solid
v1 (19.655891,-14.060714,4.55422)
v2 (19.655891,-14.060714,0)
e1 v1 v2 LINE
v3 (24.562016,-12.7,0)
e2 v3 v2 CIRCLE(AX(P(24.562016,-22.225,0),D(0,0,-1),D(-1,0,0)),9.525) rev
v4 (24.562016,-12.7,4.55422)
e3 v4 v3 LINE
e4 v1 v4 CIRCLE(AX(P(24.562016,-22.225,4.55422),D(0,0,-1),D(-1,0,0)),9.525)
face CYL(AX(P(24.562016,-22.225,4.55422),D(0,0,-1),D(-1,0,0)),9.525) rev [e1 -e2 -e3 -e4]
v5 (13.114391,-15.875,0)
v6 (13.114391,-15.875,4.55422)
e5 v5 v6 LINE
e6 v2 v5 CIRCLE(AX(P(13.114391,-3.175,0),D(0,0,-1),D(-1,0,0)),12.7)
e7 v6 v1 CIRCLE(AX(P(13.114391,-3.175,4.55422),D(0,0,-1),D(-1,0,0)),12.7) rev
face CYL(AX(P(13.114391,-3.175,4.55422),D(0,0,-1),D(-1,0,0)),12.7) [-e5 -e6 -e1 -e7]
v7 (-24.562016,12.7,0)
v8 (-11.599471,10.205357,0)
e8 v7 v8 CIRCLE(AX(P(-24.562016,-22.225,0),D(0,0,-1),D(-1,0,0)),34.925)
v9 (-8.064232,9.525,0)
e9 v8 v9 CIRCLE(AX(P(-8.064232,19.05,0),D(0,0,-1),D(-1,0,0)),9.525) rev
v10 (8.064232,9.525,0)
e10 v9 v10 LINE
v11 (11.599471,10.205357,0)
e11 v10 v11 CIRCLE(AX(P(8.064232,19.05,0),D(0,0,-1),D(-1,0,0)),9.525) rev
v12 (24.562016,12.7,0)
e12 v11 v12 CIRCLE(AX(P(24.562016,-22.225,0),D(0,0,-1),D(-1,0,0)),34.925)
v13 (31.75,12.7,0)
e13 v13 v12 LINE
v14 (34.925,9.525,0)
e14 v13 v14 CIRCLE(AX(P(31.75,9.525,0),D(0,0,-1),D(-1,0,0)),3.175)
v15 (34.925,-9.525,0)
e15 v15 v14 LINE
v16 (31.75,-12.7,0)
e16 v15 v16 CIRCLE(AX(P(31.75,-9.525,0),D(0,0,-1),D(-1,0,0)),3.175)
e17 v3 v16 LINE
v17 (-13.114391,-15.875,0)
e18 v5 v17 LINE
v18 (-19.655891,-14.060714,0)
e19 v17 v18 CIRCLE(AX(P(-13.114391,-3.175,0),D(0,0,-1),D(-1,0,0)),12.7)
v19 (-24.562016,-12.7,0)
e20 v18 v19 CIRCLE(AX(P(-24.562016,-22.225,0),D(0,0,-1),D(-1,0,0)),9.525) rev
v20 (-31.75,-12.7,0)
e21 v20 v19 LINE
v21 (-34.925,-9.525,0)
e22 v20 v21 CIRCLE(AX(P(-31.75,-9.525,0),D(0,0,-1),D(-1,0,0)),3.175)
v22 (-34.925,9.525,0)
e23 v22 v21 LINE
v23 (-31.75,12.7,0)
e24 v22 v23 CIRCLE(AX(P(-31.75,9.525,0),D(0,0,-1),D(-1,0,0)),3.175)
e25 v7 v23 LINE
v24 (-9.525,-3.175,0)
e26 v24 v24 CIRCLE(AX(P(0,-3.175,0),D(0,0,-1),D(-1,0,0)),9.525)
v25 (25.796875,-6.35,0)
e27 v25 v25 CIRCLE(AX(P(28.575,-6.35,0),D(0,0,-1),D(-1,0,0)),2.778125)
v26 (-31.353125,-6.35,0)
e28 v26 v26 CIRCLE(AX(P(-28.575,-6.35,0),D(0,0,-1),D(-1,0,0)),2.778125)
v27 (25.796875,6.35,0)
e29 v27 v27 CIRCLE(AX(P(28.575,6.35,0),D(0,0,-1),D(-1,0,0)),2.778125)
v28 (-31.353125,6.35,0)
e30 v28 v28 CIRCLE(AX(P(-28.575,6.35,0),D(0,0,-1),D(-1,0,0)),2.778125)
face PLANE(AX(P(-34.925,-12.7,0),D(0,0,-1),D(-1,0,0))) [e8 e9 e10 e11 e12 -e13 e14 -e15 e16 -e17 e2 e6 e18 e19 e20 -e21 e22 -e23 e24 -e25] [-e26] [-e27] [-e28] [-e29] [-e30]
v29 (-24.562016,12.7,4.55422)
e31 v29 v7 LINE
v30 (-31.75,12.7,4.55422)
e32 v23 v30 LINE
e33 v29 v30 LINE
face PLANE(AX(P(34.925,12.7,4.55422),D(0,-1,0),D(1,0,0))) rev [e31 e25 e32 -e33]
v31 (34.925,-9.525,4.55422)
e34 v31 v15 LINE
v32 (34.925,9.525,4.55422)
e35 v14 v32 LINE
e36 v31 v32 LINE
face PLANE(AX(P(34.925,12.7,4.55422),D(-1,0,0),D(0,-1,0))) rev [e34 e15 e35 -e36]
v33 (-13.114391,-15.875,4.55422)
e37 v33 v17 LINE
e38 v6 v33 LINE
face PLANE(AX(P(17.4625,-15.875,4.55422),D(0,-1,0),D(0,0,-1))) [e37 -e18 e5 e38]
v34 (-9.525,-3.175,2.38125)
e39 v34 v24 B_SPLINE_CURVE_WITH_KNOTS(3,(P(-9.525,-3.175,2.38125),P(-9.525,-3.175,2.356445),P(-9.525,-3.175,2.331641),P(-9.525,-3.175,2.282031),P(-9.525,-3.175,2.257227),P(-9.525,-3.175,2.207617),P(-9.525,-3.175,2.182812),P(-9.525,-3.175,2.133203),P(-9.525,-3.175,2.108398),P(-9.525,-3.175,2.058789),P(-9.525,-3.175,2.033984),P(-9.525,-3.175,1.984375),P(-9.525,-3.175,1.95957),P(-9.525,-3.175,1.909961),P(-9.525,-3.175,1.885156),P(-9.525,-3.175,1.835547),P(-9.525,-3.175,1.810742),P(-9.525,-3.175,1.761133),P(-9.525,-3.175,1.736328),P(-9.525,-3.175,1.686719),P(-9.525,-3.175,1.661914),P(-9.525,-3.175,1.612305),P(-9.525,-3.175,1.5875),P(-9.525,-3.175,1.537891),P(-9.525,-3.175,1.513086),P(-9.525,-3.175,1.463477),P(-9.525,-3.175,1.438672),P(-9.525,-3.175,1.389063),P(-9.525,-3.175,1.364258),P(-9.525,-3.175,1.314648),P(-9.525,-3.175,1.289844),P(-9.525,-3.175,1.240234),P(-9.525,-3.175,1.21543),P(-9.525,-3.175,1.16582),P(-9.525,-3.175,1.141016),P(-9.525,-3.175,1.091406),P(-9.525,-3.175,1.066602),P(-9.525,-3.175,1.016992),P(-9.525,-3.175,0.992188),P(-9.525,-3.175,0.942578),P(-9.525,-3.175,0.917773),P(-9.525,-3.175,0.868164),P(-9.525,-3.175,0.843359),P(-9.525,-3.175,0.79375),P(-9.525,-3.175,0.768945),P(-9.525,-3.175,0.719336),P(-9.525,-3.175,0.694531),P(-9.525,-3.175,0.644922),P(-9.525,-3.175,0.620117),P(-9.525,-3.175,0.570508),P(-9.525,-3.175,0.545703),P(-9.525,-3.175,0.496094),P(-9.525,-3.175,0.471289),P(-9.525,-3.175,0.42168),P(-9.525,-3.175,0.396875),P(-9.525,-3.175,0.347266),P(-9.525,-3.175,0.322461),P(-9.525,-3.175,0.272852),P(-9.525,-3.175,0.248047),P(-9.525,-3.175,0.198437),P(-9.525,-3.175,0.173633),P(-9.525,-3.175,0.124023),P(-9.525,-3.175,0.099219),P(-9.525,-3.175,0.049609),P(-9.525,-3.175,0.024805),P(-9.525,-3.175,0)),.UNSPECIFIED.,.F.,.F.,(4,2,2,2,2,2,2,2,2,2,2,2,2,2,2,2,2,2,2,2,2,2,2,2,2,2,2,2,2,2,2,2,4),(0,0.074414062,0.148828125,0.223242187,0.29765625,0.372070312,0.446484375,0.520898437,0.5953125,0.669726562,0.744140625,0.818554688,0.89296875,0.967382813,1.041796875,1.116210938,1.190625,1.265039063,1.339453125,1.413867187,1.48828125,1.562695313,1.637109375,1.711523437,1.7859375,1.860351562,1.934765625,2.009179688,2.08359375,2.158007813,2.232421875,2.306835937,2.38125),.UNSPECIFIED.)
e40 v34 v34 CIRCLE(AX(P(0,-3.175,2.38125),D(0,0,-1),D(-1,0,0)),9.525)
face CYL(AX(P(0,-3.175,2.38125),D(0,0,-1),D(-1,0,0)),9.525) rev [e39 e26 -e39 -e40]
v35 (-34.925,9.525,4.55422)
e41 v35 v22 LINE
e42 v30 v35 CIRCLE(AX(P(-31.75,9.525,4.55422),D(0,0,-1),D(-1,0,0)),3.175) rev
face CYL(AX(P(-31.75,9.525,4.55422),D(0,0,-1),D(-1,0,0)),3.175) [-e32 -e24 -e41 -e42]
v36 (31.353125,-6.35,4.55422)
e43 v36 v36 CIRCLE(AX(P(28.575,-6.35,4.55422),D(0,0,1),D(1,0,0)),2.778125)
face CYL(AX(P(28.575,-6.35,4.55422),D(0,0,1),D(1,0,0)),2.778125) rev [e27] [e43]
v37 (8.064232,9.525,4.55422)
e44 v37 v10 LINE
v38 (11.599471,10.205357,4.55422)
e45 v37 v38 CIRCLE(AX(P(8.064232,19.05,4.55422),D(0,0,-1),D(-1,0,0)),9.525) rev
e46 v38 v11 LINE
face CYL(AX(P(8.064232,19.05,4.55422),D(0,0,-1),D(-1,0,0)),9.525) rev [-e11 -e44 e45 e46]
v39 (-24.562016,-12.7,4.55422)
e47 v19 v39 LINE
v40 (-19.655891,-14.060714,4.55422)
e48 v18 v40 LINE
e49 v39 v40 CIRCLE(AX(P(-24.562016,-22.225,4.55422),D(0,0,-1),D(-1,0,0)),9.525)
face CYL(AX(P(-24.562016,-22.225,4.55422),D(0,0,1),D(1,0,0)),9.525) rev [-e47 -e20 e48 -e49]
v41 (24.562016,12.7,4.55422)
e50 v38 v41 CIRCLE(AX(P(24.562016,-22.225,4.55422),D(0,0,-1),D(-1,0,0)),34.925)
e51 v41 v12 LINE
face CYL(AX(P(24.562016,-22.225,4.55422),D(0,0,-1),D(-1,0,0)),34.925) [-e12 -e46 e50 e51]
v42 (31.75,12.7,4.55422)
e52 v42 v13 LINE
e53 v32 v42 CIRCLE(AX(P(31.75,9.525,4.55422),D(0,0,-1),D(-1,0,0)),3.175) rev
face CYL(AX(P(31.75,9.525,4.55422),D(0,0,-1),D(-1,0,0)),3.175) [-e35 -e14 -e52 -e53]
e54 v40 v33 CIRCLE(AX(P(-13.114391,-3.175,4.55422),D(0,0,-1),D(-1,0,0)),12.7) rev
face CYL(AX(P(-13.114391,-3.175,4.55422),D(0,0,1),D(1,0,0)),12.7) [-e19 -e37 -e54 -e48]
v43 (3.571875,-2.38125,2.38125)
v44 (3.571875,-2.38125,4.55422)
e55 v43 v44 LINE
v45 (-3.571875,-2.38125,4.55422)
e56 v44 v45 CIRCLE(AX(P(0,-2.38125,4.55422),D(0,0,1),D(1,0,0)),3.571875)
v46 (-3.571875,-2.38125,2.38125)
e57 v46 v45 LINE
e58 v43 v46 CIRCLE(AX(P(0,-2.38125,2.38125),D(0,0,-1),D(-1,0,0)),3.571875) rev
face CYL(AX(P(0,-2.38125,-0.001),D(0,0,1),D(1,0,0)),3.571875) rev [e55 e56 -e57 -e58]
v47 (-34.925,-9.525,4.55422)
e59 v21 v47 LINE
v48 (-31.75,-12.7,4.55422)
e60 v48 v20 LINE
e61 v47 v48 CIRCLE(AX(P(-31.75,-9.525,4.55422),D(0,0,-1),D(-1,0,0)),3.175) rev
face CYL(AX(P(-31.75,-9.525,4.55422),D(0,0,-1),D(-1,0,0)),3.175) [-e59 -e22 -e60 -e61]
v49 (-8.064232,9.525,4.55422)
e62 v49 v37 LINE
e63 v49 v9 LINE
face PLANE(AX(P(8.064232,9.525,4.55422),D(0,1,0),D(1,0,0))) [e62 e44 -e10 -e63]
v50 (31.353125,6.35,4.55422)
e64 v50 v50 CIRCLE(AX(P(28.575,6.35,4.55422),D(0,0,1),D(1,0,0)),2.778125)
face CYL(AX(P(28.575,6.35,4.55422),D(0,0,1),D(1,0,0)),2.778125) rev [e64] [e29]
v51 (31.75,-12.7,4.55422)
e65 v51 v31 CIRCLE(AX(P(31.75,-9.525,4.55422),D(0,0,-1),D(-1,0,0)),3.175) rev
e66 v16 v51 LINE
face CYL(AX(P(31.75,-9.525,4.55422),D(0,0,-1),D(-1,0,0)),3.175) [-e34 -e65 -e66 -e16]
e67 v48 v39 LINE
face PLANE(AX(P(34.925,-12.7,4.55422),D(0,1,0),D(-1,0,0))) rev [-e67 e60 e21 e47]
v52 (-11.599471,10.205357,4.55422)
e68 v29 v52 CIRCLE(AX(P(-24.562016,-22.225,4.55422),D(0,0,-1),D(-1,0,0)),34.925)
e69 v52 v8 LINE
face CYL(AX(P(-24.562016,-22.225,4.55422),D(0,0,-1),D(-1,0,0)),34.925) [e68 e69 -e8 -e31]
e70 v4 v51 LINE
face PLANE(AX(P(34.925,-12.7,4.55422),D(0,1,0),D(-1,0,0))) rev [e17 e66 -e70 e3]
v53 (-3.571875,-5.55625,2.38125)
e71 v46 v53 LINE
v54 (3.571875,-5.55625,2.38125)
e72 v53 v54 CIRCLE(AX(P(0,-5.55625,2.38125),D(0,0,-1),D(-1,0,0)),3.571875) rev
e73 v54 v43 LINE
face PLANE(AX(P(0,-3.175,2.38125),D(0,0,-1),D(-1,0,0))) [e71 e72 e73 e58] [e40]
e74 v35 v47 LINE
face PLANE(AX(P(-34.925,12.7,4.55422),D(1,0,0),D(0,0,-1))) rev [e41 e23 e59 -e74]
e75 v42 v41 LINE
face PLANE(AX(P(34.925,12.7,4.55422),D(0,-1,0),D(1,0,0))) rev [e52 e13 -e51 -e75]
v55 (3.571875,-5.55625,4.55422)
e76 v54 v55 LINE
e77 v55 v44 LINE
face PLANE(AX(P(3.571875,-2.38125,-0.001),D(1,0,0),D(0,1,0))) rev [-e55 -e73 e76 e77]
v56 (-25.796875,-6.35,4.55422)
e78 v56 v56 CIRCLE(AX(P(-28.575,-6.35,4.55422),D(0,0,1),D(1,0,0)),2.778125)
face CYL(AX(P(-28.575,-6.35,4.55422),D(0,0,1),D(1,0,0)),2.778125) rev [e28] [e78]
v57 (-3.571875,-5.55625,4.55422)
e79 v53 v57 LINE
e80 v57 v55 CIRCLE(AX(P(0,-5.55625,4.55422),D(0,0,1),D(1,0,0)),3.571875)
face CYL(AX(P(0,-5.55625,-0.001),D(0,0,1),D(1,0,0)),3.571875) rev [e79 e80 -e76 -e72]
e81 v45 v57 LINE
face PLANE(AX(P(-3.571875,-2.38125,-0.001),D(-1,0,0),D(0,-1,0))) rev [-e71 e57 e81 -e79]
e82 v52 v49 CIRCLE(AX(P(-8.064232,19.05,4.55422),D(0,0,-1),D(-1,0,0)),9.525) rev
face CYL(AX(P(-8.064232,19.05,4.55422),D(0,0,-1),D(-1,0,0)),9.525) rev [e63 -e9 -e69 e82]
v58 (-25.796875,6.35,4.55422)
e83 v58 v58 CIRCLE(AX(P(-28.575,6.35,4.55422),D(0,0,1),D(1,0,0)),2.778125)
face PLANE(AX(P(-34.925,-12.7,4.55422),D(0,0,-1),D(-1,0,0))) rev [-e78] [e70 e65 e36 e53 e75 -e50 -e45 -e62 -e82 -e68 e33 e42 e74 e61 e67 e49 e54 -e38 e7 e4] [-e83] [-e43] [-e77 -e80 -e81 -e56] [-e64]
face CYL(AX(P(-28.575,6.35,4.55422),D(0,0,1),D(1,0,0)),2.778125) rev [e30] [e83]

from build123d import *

# Parameters (mm, degrees)
SKETCH1_W                       = 69.85
SKETCH1_H                       = 25.4
BASE_FLANGE1_DEPTH              = 4.55422
F_7_32_0_21875_DIAMETER_HOLE1_D = 5.55625
BREAK_CORNER1_DEPTH             = 4.55422
SKETCH4_W                       = 34.925
SKETCH4_H                       = 3.175
TAB1_DEPTH                      = 4.55422
FILLET1_R                       = 9.525
CUT_EXTRUDE1_REACH              = 40.633
SKETCH7_R                       = 9.525
CUT_EXTRUDE3_DEPTH              = 2.38125
F_9_32_0_28125_DIAMETER_HOLE1_D = 7.14375
FILLET3_R                       = 12.7
CUT_EXTRUDE4_START              = -2.17297
CUT_EXTRUDE4_DEPTH              = 2.17297


# Read off the part's stored shape, not the designer's step: Break-Corner1
# Sheet-metal steps are written as plain solids
with BuildPart() as part:
    # Sketch1 → Base-Flange1 (new body)
    with BuildSketch(Plane.XY):
        Rectangle(SKETCH1_W, SKETCH1_H)
    extrude(amount=BASE_FLANGE1_DEPTH)

    # 7/32 (0.21875) Diameter Hole1 (through all)
    with Locations(Plane.XY.offset(4.55422)):
        with Locations((-28.575, 6.35), (-28.575, -6.35), (28.575, 6.35), (28.575, -6.35)):
            Hole(F_7_32_0_21875_DIAMETER_HOLE1_D / 2)

    # Break-Corner1 outline → Break-Corner1 (cut)
    with BuildSketch(Plane.XY):
        with BuildLine():
            Line((34.925, -12.7), (34.925, -9.525))
            ThreePointArc((34.925, -9.525), (33.99506403, -11.77006403), (31.75, -12.7))
            Line((31.75, -12.7), (34.925, -12.7))
        make_face()
        with BuildLine():
            ThreePointArc((31.75, 12.7), (33.99506403, 11.77006403), (34.925, 9.525))
            Line((34.925, 9.525), (34.925, 12.7))
            Line((34.925, 12.7), (31.75, 12.7))
        make_face()
        with BuildLine():
            Line((-34.925, -12.7), (-31.75, -12.7))
            ThreePointArc((-31.75, -12.7), (-33.99506403, -11.77006403), (-34.925, -9.525))
            Line((-34.925, -9.525), (-34.925, -12.7))
        make_face()
        with BuildLine():
            ThreePointArc((-34.925, 9.525), (-33.99506403, 11.77006403), (-31.75, 12.7))
            Line((-31.75, 12.7), (-34.925, 12.7))
            Line((-34.925, 12.7), (-34.925, 9.525))
        make_face()
    extrude(amount=BREAK_CORNER1_DEPTH, mode=Mode.SUBTRACT)

    # Sketch4 → Tab1 (add)
    with BuildSketch(Plane(origin=(0, 0, 0), x_dir=(-1, 0, 0), z_dir=(0, 0, -1))):
        with Locations((0, -14.2875)):
            Rectangle(SKETCH4_W, SKETCH4_H)
    extrude(amount=-TAB1_DEPTH)

    # Fillet1
    # the kernel refuses this fillet: 9.525 mm, written as the material it adds along each edge
    with BuildSketch(Plane(origin=(-17.4625, -12.7, 0), x_dir=(-1, 0, 0), z_dir=(0, 0, 1))) as fillet1_piece_1:
        with BuildLine():
            CenterArc((7.099515829, 9.525), FILLET1_R, 221.810314896, 48.189685104)
            Line((0, 3.175), (-0.141990317, 3.048))
            ThreePointArc((-0.141990317, 3.048), (-0.1905, 1.5875), (-0.1905, 0))
            Line((-0.1905, 0), (0, -0.1905))
            Line((0, -0.1905), (7.099515829, -0.1905))
            Line((7.099515829, -0.1905), (7.099515829, 0))
        make_face()
    extrude(amount=4.55422)
    with BuildSketch(Plane(origin=(17.4625, -12.7, 0), x_dir=(1, 0, 0), z_dir=(0, 0, 1))) as fillet1_piece_2:
        with BuildLine():
            CenterArc((7.099515829, -9.525), FILLET1_R, 90, 48.189685104)
            Line((0, -3.175), (-0.141990317, -3.048))
            ThreePointArc((-0.141990317, -3.048), (-0.1905, -1.5875), (-0.1905, 0))
            Line((-0.1905, 0), (0, 0.1905))
            Line((0, 0.1905), (7.099515829, 0.1905))
            Line((7.099515829, 0.1905), (7.099515829, 0))
        make_face()
    extrude(amount=4.55422)

    # Sketch5 → Cut-Extrude1 (cut, up to next)
    with BuildSketch(Plane(origin=(0, 0, 0), x_dir=(-1, 0, 0), z_dir=(0, 0, -1)), mode=Mode.PRIVATE) as cut_extrude1_sk1:
        with BuildLine():
            Line((-8.064231886, 9.525), (8.064231886, 9.525))
            ThreePointArc((8.064231886, 9.525), (9.864287689, 9.69663568), (11.599471303, 10.205357143))
            ThreePointArc((11.599471303, 10.205357143), (17.961811219, 12.070669174), (24.562015829, 12.7))
            Line((24.562015829, 12.7), (-24.562015829, 12.7))
            ThreePointArc((-24.562015829, 12.7), (-17.961811219, 12.070669174), (-11.599471303, 10.205357143))
            ThreePointArc((-11.599471303, 10.205357143), (-9.864287689, 9.69663568), (-8.064231886, 9.525))
        make_face()
    cut_extrude1_tool1 = extrude(cut_extrude1_sk1.sketch, amount=-CUT_EXTRUDE1_REACH, mode=Mode.PRIVATE) & part.part
    add(cut_extrude1_tool1.solids().sort_by_distance((0, 11.328032, 0))[0], mode=Mode.SUBTRACT)

    # Sketch7 → Cut-Extrude3 (cut)
    with BuildSketch(Plane(origin=(0, 0, 0), x_dir=(-1, 0, 0), z_dir=(0, 0, -1))):
        with Locations((0, -3.175)):
            Circle(SKETCH7_R)
    extrude(amount=-CUT_EXTRUDE3_DEPTH, mode=Mode.SUBTRACT)

    # 9/32 (0.28125) Diameter Hole1 (through all)
    with Locations(Plane(origin=(0, 0, 2.38125), x_dir=(-1, 0, 0), z_dir=(0, 0, -1))):
        with Locations((0, -3.175)):
            Hole(F_9_32_0_28125_DIAMETER_HOLE1_D / 2)

    # Fillet3
    fillet3_edges = [part.edges().sort_by_distance(p)[0] for p in [
        (17.4625, -15.875, 2.27711),
        (-17.4625, -15.875, 2.27711),
    ]]
    fillet(fillet3_edges, radius=FILLET3_R)

    # Sketch10 → Cut-Extrude4 (cut)
    with BuildSketch(Plane.XY.offset(4.55422).offset(CUT_EXTRUDE4_START)):
        with BuildLine():
            Line((3.571875, -2.38125), (3.571875, -5.55625))
            ThreePointArc((3.571875, -5.55625), (0, -9.128125), (-3.571875, -5.55625))
            Line((-3.571875, -5.55625), (-3.571875, -2.38125))
            ThreePointArc((-3.571875, -2.38125), (0, 1.190625), (3.571875, -2.38125))
        make_face()
    extrude(amount=CUT_EXTRUDE4_DEPTH, mode=Mode.SUBTRACT)


solid = part.part
